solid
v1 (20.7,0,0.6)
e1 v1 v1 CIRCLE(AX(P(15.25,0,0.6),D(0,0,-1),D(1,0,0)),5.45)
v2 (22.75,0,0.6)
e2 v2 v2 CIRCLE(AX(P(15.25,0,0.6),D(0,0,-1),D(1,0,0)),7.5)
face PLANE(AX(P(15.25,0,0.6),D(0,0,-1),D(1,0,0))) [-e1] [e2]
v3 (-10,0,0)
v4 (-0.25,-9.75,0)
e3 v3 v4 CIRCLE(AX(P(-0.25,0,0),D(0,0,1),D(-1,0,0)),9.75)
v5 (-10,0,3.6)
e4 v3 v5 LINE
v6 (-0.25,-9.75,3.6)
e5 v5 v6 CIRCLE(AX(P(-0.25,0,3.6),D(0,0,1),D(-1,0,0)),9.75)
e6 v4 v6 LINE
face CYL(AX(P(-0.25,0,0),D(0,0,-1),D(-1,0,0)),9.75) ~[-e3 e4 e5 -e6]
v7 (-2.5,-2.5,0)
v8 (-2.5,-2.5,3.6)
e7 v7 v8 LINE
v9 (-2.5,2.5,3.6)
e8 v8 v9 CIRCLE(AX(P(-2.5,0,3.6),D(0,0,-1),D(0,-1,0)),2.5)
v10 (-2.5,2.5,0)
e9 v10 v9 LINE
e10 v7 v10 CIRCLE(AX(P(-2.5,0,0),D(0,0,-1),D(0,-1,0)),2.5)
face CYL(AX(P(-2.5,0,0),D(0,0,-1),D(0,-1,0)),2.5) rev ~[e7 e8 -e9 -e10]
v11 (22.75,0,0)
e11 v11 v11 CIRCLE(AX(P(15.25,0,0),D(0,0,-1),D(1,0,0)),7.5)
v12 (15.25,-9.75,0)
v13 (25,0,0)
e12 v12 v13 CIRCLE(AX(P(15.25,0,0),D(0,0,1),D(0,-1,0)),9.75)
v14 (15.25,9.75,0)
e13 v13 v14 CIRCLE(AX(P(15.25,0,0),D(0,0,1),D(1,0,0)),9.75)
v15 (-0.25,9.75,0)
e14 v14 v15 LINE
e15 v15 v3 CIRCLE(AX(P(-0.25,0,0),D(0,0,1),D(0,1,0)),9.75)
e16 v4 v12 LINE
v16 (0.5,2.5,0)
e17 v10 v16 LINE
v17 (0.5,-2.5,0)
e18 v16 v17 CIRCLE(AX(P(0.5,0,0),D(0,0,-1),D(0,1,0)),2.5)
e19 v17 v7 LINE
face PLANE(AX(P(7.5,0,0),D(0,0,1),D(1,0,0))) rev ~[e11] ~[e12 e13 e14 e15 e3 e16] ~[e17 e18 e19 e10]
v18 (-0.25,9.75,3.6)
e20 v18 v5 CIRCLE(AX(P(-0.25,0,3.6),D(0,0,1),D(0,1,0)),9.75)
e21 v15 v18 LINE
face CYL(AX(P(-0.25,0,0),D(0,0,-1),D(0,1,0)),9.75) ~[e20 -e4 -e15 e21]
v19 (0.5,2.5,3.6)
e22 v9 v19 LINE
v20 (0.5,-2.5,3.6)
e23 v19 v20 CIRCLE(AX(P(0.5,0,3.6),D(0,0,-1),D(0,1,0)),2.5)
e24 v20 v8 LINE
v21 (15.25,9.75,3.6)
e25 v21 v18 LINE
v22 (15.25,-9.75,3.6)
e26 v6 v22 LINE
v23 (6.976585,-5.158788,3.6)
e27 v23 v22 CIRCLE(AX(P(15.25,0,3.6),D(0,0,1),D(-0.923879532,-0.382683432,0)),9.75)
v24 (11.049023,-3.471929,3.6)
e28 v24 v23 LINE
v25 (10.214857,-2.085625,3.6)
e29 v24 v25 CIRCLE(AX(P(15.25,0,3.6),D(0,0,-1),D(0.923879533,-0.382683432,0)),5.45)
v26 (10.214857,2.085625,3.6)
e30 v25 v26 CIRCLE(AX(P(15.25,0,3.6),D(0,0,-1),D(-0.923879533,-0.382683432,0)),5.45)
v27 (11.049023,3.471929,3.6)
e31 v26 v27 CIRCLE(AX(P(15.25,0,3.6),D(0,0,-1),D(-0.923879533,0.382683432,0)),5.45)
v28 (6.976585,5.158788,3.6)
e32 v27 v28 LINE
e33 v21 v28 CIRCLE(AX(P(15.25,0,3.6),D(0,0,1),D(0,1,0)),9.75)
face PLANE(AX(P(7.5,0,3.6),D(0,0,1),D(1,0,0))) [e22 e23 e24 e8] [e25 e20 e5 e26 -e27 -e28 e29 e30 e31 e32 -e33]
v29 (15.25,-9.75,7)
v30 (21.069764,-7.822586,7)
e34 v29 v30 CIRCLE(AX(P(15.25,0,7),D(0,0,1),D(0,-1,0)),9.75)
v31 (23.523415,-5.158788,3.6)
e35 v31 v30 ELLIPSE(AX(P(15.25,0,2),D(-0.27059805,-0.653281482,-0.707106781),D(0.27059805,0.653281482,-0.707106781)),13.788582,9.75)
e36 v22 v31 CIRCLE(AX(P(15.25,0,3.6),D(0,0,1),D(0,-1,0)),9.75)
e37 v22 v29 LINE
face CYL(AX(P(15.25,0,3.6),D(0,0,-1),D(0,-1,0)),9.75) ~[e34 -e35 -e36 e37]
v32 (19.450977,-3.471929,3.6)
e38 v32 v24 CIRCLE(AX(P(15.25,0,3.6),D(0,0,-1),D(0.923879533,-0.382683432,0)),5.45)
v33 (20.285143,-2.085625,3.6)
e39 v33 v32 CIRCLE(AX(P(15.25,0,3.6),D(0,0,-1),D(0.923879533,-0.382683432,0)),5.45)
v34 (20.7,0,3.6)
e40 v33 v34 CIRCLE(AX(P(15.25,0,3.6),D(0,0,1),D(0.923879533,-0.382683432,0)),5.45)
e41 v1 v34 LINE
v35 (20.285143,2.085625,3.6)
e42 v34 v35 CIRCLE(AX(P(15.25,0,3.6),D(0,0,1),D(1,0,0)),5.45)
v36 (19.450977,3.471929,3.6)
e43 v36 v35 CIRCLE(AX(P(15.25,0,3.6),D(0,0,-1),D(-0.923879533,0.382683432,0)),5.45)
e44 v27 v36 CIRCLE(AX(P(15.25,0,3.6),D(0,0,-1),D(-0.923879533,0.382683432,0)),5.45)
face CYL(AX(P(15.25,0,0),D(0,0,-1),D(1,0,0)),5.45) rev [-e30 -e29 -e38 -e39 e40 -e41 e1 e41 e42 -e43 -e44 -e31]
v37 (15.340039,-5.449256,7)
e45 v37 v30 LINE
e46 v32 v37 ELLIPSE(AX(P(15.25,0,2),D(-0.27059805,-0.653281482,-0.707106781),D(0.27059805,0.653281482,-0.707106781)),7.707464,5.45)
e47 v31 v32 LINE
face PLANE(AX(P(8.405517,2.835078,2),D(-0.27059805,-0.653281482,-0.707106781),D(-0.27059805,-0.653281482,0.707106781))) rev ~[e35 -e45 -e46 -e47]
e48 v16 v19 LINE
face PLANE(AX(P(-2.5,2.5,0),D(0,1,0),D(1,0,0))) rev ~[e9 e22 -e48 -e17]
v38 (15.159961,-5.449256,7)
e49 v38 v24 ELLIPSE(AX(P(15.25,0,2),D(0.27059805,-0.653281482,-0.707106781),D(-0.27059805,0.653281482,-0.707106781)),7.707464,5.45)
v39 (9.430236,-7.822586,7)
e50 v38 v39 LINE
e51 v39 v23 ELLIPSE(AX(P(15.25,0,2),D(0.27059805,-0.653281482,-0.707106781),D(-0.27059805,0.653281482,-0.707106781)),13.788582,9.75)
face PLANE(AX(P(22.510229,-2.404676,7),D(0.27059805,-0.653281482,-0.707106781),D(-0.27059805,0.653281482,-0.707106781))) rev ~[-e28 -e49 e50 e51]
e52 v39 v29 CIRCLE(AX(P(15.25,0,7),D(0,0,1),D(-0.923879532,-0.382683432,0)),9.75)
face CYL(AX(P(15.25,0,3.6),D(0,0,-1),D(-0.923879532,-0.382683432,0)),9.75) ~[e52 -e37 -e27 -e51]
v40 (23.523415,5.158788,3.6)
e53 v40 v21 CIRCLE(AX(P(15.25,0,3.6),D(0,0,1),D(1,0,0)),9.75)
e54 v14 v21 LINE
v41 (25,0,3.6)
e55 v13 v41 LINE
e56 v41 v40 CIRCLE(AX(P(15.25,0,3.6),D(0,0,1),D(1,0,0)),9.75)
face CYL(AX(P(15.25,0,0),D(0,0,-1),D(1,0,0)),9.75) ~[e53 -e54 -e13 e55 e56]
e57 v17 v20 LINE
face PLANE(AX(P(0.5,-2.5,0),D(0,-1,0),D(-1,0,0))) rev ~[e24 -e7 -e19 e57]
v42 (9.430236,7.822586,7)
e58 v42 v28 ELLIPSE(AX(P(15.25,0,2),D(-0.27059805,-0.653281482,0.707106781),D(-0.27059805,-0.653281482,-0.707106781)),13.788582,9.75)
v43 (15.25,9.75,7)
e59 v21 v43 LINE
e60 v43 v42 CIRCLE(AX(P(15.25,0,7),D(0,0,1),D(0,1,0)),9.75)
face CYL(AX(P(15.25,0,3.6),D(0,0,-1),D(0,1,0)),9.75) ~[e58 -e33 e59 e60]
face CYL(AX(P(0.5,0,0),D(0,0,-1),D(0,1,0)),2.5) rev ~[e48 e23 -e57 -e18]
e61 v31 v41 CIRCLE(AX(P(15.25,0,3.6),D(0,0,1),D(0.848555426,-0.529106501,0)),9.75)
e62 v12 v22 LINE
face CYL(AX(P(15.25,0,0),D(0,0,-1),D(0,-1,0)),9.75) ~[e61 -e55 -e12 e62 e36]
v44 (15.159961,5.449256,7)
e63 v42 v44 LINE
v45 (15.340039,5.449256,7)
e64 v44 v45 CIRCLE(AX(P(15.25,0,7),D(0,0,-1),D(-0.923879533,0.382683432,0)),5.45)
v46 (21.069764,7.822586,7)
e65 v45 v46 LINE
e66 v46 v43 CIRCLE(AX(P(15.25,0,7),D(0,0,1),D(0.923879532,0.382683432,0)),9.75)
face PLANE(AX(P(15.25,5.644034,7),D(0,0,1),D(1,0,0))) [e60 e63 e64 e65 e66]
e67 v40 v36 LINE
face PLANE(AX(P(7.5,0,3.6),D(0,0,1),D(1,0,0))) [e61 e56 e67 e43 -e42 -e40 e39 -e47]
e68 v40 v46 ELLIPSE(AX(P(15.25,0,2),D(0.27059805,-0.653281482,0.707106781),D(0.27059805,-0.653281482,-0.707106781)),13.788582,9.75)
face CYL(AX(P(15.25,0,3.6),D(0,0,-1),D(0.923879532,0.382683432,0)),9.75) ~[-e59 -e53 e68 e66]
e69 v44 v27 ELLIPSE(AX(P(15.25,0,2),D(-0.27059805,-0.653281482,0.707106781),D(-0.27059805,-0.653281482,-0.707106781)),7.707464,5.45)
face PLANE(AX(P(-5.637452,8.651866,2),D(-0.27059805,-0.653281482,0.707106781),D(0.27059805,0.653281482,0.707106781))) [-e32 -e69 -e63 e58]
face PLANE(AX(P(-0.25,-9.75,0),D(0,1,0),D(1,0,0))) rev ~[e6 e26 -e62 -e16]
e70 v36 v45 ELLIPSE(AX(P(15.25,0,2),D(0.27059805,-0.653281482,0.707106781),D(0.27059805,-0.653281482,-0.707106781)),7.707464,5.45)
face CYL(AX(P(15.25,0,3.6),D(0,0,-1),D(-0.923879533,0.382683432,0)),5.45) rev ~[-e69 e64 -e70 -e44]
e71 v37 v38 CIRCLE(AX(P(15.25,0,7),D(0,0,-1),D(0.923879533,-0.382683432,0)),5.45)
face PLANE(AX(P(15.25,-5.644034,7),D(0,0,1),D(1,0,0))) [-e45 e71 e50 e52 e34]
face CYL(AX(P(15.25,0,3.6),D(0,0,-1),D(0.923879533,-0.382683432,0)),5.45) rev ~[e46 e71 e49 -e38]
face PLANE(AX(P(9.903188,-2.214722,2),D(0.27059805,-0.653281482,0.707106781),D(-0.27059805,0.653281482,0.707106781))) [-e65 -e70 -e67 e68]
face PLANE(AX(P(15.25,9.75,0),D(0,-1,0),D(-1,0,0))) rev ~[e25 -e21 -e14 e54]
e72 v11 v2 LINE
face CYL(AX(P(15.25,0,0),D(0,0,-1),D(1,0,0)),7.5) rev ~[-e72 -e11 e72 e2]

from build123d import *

# Parameters (mm, degrees)
F0_R        = 5.45
F1_DEPTH    = 3.6
F3_DEPTH    = 3.4
F4_T4_DEPTH = 30.0168298797
F5_T4_DEPTH = 28.3957620677
F6_T4_DEPTH = 30.0168298797
F7_T4_DEPTH = 28.3957620678
F8_R        = 7.5
F9_DEPTH    = 0.6


# Not quite as in the source:
# - a fillet or chamfer that OpenCascade refuses, or shapes differently, is made with other operations: its cross-section is extruded or revolved along the edge and cut away or added


with BuildPart() as f1:
    # F0 (on Top) → F1 (new body)
    with BuildSketch(Plane.XY):
        with BuildLine():
            Line((15.25, 9.75), (-0.25, 9.75))
            ThreePointArc((-0.25, 9.75), (-7.1442911166, 6.8942911166), (-10, 0))
            ThreePointArc((-10, 0), (-7.1442911166, -6.8942911166), (-0.25, -9.75))
            Line((-0.25, -9.75), (15.25, -9.75))
            ThreePointArc((15.25, -9.75), (22.1442911166, -6.8942911166), (25, 0))
            ThreePointArc((25, 0), (22.1442911166, 6.8942911166), (15.25, 9.75))
        make_face()
        with BuildLine():
            ThreePointArc((-2.5, -2.5), (-5, 0), (-2.5, 2.5))
            Line((-2.5, 2.5), (0.5, 2.5))
            ThreePointArc((0.5, 2.5), (3, 0), (0.5, -2.5))
            Line((0.5, -2.5), (-2.5, -2.5))
        make_face(mode=Mode.SUBTRACT)
        with Locations((15.25, 0)):
            Circle(F0_R, mode=Mode.SUBTRACT)
    extrude(amount=F1_DEPTH)

    # F2 (on face) → F3 (join)
    with BuildSketch(Plane.XY.offset(3.6)):
        with BuildLine():
            Line((6.242174558, 3.7311634656), (10.2148565478, 2.0856247064))
            ThreePointArc((10.2148565478, 2.0856247064), (15.25, 5.45), (20.2851434522, 2.0856247064))
            Line((20.2851434522, 2.0856247064), (24.257825442, 3.7311634656))
            ThreePointArc((24.257825442, 3.7311634656), (20.6668097719, 8.1068287199), (15.25, 9.75))
            ThreePointArc((15.25, 9.75), (9.8331902281, 8.1068287199), (6.242174558, 3.7311634656))
        make_face()
        with BuildLine():
            ThreePointArc((20.2851434522, -2.0856247064), (15.25, -5.45), (10.2148565478, -2.0856247064))
            Line((10.2148565478, -2.0856247064), (6.242174558, -3.7311634656))
            ThreePointArc((6.242174558, -3.7311634656), (9.8331902281, -8.1068287199), (15.25, -9.75))
            ThreePointArc((15.25, -9.75), (20.6668097719, -8.1068287199), (24.257825442, -3.7311634656))
            Line((24.257825442, -3.7311634656), (20.2851434522, -2.0856247064))
        make_face()
    extrude(amount=F3_DEPTH)

    # F4: chamfer of 5 on 1 edges, made by hand


with BuildPart() as f4_tool2:
    # F4_s3 → F4_t4 (new body)
    with BuildSketch(Plane(origin=(-7.8707626189, 3.260176623, 0), x_dir=(0, 0, 1), z_dir=(0.9238795325, -0.3826834324, 0))):
        Polygon((2, -5.8359223436), (7, -10.8359223436), (7, -5.8359223436), align=None)
    extrude(amount=F4_T4_DEPTH)

    split(bisect_by=Plane.XY.offset(3.6), keep=Keep.TOP)


with BuildPart() as f1_1:
    add(f1.part)

    # F4_t1: cut F4_tool2
    add(f4_tool2.part, mode=Mode.SUBTRACT)

    # F5: chamfer of 5 on 1 edges, made by hand


with BuildPart() as f5_tool2:
    # F5_s3 → F5_t4 (new body)
    with BuildSketch(Plane(origin=(7.6698776475, 3.1769673433, 0), x_dir=(0, 0, 1), z_dir=(0.9238795325, 0.3826834324, 0))):
        Polygon((2, 5.8359223436), (7, 0.8359223436), (7, 5.8359223436), align=None)
    extrude(amount=F5_T4_DEPTH)

    split(bisect_by=Plane.XY.offset(3.6), keep=Keep.TOP)


with BuildPart() as f1_2:
    add(f1_1.part)

    # F5_t1: cut F5_tool2
    add(f5_tool2.part, mode=Mode.SUBTRACT)

    # F6: chamfer of 5 on 1 edges, made by hand


with BuildPart() as f6_tool2:
    # F6_s3 → F6_t4 (new body)
    with BuildSketch(Plane(origin=(6.1722062753, -2.556611549, 0), x_dir=(0, 0, 1), z_dir=(0.9238795325, -0.3826834324, 0))):
        Polygon((2, -5.8359223436), (7, -0.8359223436), (7, -5.8359223436), align=None)
    extrude(amount=F6_T4_DEPTH)

    split(bisect_by=Plane.XY.offset(3.6), keep=Keep.TOP)


with BuildPart() as f1_3:
    add(f1_2.part)

    # F6_t1: cut F6_tool2
    add(f6_tool2.part, mode=Mode.SUBTRACT)

    # F7: chamfer of 5 on 1 edges, made by hand


with BuildPart() as f7_tool2:
    # F7_s3 → F7_t4 (new body)
    with BuildSketch(Plane(origin=(18.3635007657, 7.6064110698, 0), x_dir=(0, 0, 1), z_dir=(-0.9238795325, -0.3826834324, 0))):
        Polygon((7, -10.8359223436), (2, -5.8359223436), (7, -5.8359223436), align=None)
    extrude(amount=F7_T4_DEPTH)

    split(bisect_by=Plane.XY.offset(3.6), keep=Keep.TOP)


with BuildPart() as f1_4:
    add(f1_3.part)

    # F7_t1: cut F7_tool2
    add(f7_tool2.part, mode=Mode.SUBTRACT)

    # F8 (on face) → F9 (cut)
    with BuildSketch(Plane(origin=(0, 0, 0), x_dir=(1, 0, 0), z_dir=(0, 0, -1))):
        with Locations((15.25, 0)):
            Circle(F8_R)
    extrude(amount=-F9_DEPTH, mode=Mode.SUBTRACT)


solid = f1_4.part
